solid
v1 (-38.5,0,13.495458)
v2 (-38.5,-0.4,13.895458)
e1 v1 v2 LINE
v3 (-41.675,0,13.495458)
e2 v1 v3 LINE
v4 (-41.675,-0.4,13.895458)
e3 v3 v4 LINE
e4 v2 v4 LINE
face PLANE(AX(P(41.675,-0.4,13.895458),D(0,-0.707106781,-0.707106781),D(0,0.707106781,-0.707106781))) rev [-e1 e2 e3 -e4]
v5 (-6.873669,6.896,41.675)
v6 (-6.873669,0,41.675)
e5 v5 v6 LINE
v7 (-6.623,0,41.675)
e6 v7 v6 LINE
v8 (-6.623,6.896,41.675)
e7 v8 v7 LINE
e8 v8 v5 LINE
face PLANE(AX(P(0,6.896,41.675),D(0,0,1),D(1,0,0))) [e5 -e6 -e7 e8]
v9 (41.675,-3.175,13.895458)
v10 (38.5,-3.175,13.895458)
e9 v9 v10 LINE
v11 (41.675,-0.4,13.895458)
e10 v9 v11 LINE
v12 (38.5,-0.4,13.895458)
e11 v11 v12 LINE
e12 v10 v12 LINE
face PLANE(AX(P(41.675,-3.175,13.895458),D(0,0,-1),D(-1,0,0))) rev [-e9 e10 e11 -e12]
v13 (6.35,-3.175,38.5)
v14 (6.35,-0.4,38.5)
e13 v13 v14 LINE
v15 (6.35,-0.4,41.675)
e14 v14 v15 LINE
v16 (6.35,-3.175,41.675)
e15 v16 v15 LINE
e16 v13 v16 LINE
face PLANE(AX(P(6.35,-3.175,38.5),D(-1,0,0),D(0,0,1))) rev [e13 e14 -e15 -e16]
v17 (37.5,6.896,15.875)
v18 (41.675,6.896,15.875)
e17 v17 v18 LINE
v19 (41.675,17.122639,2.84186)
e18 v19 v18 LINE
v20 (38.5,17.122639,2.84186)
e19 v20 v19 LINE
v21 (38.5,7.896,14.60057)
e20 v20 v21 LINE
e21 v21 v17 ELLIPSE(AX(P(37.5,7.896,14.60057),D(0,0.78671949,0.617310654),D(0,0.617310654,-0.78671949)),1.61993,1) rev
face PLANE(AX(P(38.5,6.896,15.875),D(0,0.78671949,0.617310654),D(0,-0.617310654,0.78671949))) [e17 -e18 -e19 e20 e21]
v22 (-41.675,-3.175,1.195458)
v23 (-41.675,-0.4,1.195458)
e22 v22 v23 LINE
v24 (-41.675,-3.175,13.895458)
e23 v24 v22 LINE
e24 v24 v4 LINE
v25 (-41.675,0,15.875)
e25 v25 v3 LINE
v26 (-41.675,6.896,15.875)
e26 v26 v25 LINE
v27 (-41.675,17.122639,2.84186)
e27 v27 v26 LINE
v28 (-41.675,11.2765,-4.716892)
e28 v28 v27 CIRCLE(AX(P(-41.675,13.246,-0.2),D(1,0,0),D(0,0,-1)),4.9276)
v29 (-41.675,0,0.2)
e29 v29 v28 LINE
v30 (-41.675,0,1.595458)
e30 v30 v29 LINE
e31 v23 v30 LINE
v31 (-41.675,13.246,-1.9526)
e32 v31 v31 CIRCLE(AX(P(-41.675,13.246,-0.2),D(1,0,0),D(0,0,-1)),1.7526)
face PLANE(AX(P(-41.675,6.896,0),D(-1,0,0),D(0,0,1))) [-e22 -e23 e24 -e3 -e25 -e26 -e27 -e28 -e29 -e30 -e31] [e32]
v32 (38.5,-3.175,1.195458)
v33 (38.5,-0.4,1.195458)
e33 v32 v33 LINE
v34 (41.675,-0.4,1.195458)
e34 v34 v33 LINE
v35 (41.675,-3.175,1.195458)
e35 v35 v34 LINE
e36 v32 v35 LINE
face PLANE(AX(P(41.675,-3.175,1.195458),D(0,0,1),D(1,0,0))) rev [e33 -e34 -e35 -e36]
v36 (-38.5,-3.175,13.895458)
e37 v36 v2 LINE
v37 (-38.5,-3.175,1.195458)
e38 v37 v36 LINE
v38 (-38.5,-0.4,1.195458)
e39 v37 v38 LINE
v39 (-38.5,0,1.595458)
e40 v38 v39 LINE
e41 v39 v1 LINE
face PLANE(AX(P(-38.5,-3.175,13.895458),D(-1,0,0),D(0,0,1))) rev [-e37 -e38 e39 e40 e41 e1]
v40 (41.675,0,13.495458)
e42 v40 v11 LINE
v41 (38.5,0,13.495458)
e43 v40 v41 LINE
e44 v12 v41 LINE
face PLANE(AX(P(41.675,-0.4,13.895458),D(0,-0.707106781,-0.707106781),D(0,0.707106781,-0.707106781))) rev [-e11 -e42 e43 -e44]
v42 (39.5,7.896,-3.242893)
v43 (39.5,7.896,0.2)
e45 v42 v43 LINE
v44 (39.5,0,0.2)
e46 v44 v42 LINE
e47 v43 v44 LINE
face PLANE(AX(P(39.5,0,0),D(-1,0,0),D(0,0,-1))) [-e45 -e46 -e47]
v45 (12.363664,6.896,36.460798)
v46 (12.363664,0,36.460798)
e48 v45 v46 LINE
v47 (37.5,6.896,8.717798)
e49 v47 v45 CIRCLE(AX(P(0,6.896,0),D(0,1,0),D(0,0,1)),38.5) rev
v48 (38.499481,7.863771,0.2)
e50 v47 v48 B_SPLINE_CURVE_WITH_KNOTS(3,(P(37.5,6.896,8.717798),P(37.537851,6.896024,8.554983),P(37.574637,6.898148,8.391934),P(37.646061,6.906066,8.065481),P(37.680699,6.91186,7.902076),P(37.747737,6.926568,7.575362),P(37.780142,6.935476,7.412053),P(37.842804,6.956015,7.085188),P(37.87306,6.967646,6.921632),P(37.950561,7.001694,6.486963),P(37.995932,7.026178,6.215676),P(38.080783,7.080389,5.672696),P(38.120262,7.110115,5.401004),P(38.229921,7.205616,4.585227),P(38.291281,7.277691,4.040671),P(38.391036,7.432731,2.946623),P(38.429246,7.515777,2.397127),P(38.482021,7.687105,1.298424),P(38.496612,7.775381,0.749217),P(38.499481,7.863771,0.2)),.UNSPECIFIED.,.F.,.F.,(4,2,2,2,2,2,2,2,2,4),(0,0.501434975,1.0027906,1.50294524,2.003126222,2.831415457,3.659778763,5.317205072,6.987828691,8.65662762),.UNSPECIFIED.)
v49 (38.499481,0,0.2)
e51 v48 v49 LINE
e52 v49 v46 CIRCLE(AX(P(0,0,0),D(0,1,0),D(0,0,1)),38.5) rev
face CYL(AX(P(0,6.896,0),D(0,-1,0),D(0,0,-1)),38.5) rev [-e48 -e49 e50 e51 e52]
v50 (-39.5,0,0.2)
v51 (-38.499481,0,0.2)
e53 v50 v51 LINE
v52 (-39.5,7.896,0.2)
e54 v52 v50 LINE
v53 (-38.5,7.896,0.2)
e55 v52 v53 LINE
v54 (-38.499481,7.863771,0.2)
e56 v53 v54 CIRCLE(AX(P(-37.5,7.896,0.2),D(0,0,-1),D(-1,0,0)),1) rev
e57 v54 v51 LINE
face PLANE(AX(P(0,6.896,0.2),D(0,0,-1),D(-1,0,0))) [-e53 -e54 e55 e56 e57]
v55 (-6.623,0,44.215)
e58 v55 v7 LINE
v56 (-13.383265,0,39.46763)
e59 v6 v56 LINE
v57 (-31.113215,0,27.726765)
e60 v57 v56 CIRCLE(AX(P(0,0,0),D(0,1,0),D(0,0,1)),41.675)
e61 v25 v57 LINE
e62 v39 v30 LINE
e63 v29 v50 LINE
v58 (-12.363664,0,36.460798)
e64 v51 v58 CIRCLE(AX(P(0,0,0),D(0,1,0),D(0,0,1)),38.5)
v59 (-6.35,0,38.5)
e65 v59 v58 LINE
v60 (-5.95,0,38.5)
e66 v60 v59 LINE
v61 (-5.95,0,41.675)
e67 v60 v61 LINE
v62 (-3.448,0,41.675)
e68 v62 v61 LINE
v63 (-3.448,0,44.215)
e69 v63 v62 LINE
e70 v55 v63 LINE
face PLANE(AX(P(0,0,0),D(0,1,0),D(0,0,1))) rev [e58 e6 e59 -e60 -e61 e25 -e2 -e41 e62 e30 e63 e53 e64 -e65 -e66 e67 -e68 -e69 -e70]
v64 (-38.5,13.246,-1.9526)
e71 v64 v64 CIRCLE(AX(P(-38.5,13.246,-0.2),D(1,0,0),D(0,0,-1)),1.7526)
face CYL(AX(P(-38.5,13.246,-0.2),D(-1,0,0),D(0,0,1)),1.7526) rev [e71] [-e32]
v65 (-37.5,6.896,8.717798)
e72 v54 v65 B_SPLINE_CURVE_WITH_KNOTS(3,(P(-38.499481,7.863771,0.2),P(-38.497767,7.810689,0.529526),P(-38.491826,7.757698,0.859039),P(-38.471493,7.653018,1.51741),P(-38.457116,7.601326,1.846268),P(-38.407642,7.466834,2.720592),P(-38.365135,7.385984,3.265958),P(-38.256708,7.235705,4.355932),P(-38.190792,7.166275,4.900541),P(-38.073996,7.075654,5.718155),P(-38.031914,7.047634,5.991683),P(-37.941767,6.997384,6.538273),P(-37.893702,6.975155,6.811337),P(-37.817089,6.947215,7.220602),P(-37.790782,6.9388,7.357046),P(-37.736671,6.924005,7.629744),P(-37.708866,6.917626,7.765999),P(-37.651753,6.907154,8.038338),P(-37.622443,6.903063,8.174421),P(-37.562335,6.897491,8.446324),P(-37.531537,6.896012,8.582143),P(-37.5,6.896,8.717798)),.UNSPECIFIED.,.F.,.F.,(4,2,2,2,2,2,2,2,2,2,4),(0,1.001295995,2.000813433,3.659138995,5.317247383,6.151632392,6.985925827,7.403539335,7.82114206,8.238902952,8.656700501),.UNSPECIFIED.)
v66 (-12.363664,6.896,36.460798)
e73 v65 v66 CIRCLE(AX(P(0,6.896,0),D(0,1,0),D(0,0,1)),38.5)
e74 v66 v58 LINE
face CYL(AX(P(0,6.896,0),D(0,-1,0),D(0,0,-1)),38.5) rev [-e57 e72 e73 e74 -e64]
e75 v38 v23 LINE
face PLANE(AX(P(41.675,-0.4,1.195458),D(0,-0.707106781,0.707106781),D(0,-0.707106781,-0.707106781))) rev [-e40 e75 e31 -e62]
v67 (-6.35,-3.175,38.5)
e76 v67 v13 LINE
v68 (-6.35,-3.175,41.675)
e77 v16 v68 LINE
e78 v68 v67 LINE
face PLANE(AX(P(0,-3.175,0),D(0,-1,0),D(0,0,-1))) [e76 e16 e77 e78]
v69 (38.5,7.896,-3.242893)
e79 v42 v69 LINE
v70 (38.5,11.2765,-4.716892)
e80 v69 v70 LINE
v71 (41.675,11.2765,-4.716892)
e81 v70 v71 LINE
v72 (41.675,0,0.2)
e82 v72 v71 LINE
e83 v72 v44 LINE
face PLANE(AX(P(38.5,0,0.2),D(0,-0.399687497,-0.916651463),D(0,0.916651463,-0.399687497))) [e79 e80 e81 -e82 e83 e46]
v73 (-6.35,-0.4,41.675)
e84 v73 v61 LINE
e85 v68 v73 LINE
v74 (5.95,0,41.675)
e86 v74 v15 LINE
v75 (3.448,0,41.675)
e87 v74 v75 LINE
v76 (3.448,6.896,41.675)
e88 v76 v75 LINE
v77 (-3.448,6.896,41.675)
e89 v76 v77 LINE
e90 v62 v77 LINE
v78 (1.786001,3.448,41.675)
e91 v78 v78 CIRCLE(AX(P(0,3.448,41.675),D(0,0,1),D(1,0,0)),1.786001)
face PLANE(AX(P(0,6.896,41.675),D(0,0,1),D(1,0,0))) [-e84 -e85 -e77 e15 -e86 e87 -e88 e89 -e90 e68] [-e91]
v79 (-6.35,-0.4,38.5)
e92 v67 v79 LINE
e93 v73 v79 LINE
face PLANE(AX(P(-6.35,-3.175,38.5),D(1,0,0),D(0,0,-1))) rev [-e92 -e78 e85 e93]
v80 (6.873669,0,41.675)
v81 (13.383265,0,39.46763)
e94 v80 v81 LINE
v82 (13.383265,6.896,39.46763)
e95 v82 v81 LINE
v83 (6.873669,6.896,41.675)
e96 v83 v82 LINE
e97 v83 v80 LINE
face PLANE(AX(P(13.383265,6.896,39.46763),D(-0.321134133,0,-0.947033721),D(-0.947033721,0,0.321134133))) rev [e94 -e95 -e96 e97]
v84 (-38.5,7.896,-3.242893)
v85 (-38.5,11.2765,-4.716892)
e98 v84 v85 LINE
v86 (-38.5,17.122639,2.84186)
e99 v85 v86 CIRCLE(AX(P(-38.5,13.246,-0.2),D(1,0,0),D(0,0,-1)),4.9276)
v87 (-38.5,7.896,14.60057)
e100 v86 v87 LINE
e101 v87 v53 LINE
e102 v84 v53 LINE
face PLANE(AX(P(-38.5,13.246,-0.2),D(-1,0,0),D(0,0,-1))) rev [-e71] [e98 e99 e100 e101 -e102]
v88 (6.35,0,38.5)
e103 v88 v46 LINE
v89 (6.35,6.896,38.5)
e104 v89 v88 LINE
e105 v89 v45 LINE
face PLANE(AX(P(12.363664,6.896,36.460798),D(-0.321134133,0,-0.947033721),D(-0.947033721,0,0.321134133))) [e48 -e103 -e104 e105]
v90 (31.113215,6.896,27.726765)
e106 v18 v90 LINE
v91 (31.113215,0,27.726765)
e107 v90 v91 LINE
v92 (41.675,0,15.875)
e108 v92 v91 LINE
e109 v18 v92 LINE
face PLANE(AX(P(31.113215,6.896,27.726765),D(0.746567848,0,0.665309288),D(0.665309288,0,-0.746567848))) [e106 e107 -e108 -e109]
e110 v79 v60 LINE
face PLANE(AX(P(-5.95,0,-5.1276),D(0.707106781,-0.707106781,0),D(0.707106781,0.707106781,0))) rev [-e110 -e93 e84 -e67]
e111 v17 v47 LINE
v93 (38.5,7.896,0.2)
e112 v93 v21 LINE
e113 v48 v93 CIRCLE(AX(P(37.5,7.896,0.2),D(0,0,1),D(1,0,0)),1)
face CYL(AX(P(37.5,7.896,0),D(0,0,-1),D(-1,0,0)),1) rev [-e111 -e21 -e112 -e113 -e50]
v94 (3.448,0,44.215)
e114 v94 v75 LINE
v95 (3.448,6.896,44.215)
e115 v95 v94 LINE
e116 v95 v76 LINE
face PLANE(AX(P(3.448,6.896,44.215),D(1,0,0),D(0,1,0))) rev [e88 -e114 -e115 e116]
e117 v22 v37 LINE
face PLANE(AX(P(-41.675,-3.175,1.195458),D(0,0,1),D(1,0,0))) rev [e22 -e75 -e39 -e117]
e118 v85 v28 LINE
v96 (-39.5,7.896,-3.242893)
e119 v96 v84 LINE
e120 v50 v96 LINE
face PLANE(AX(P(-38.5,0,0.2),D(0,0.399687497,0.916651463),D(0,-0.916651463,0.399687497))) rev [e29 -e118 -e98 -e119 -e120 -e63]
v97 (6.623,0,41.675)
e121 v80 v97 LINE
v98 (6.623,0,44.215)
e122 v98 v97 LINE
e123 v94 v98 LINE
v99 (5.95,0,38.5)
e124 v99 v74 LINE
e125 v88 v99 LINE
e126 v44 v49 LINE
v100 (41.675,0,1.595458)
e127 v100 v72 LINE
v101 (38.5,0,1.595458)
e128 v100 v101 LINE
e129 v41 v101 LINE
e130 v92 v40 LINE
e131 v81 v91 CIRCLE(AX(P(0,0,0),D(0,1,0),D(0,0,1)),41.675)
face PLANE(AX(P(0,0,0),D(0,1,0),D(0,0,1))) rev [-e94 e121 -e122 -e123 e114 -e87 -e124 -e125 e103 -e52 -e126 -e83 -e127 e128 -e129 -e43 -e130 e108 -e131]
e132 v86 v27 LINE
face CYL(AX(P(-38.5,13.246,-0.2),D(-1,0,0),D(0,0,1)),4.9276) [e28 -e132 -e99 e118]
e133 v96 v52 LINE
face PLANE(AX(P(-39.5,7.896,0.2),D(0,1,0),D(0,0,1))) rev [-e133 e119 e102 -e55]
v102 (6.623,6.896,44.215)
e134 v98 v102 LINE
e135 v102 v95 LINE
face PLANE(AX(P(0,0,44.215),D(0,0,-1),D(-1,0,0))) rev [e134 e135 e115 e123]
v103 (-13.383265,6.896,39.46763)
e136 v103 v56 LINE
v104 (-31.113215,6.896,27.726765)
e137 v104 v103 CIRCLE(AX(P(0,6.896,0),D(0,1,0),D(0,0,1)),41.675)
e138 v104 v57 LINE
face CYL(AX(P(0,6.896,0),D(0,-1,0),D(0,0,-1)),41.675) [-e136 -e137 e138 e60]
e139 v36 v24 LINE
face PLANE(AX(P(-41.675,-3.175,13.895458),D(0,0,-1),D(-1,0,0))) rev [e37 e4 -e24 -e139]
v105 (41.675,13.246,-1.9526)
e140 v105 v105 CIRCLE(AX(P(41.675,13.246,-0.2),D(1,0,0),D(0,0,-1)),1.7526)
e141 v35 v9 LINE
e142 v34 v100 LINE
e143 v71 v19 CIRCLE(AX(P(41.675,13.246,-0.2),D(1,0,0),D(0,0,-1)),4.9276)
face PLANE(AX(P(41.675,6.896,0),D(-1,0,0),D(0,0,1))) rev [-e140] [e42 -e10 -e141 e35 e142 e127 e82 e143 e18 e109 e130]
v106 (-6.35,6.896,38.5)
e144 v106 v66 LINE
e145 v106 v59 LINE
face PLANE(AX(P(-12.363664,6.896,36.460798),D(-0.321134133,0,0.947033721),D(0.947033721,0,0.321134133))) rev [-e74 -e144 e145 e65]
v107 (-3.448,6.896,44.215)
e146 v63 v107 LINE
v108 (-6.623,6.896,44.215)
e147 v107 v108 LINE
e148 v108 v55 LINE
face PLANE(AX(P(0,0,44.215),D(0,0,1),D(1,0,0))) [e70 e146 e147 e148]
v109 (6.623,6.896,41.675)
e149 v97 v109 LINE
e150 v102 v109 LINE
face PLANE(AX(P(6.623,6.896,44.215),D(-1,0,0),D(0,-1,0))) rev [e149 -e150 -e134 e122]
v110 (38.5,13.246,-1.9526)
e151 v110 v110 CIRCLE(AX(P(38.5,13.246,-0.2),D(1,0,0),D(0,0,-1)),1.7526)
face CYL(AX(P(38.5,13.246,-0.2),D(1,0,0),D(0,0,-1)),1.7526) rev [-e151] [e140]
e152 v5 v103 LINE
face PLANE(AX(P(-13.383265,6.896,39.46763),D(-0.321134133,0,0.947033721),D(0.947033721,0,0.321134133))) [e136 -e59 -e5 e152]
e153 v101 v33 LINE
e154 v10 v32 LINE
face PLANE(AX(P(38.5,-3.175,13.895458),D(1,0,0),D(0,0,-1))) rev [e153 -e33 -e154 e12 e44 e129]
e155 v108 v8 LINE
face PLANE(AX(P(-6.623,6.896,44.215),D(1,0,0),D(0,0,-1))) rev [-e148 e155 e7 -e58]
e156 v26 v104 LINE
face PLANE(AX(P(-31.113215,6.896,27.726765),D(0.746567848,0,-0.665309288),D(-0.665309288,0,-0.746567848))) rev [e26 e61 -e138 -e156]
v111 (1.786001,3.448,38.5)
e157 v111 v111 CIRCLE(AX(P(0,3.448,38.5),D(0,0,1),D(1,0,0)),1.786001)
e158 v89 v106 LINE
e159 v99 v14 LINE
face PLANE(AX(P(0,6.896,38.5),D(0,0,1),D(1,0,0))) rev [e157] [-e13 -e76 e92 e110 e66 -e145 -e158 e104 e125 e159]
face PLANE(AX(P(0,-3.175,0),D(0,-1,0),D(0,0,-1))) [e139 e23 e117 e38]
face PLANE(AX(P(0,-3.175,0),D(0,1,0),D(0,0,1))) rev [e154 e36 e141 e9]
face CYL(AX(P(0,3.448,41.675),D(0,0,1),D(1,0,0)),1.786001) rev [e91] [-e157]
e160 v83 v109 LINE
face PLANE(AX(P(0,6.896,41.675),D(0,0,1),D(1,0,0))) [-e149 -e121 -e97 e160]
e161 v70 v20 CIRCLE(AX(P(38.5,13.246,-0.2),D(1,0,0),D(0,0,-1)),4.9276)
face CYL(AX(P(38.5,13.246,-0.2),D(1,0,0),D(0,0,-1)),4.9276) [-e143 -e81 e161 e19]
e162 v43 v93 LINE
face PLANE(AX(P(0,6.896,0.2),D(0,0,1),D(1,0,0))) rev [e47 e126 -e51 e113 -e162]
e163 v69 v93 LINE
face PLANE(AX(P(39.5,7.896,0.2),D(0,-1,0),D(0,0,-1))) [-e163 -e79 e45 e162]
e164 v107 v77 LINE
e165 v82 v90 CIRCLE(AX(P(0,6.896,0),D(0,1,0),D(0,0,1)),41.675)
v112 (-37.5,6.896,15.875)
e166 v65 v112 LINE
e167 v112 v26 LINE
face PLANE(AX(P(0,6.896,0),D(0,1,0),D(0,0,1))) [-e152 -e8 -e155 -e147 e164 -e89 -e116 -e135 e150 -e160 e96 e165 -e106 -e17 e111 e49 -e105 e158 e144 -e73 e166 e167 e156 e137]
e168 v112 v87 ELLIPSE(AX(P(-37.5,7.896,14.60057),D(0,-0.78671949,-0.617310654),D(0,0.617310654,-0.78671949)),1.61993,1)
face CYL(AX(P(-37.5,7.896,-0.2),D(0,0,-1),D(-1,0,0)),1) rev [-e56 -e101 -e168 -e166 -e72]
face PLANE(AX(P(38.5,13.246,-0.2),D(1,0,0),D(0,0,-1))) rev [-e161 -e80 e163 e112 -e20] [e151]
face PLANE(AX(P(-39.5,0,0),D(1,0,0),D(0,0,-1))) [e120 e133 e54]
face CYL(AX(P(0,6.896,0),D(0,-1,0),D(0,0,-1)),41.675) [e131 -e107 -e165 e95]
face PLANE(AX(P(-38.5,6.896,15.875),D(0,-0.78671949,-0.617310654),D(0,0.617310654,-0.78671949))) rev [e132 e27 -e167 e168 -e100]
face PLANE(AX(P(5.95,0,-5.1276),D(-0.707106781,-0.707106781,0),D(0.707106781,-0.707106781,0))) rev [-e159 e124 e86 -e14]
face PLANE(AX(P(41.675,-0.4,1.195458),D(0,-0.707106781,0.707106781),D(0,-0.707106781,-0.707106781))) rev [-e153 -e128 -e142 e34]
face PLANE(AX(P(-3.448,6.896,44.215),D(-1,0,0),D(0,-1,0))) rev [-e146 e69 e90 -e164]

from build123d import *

# Parameters (mm, degrees)
BOSS_EXTRUDE2_DEPTH             = 6.896
SKETCH2_R                       = 1.7526
BOSS_EXTRUDE3_DEPTH             = 3.175
F_9_64_0_14063_DIAMETER_HOLE2_D = 3.572002
SKETCH9_W                       = 3.175
SKETCH9_H                       = 6.896
BOSS_EXTRUDE5_DEPTH             = 2.54
SKETCH10_W                      = 3.175
SKETCH10_H                      = 12.7
SKETCH10_W_2                    = 12.7
SKETCH10_H_2                    = 3.175
BOSS_EXTRUDE6_DEPTH             = 3.175
CUT_EXTRUDE1_DEPTH              = 97.085734956
CUT_EXTRUDE2_DEPTH              = 66.25004773
FILLET2_R                       = 1
CUT_EXTRUDE3_DEPTH              = 1


with BuildPart() as part:
    # Sketch1 → Boss-Extrude2 (new body)
    with BuildSketch(Plane(origin=(0, 0, 0), x_dir=(1, 0, 0), z_dir=(0, 1, 0))):
        with BuildLine():
            Line((12.363664128, -36.460798254), (6.35, -38.5))
            Line((6.35, -38.5), (-6.35, -38.5))
            Line((-6.35, -38.5), (-12.363664128, -36.460798254))
            ThreePointArc((-12.363664128, -36.460798254), (-27.097558937, -27.349082245), (-36.345013413, -12.7))
            ThreePointArc((-36.345013413, -12.7), (-37.940572846, -6.539337285), (-38.499480516, -0.2))
            Line((-38.499480516, -0.2), (-41.675, -0.2))
            Line((-41.675, -0.2), (-41.675, -15.875))
            Line((-41.675, -15.875), (-31.113215051, -27.726764582))
            ThreePointArc((-31.113215051, -27.726764582), (-23.009697223, -34.747078419), (-13.383265001, -39.467630318))
            Line((-13.383265001, -39.467630318), (-6.873668831, -41.675))
            Line((-6.873668831, -41.675), (6.873668831, -41.675))
            Line((6.873668831, -41.675), (13.383265001, -39.467630318))
            ThreePointArc((13.383265001, -39.467630318), (23.009697223, -34.747078419), (31.113215051, -27.726764582))
            Line((31.113215051, -27.726764582), (41.675, -15.875))
            Line((41.675, -15.875), (41.675, -0.2))
            Line((41.675, -0.2), (38.499480516, -0.2))
            ThreePointArc((38.499480516, -0.2), (37.940572846, -6.539337285), (36.345013413, -12.7))
            ThreePointArc((36.345013413, -12.7), (27.097558937, -27.349082245), (12.363664128, -36.460798254))
        make_face()
    extrude(amount=BOSS_EXTRUDE2_DEPTH)

    # Sketch2 → Boss-Extrude3 (add)
    with BuildSketch(Plane(origin=(41.675, 0, 0), x_dir=(0, 0, -1), z_dir=(1, 0, 0))):
        with BuildLine():
            Line((-15.875, 6.896), (-2.841859979, 17.12263896))
            ThreePointArc((-2.841859979, 17.12263896), (3.214674972, 17.143816898), (4.716891749, 11.27649989))
            Line((4.716891749, 11.27649989), (-0.2, 0))
            Line((-0.2, 0), (-0.2, 6.896))
            Line((-0.2, 6.896), (-15.875, 6.896))
        make_face()
        with Locations((0.2, 13.246)):
            Circle(SKETCH2_R, mode=Mode.SUBTRACT)
    boss_extrude3 = extrude(amount=-BOSS_EXTRUDE3_DEPTH)

    # Mirror1: Boss-Extrude3 across plane
    add(boss_extrude3.mirror(Plane.ZY))

    # 9/64 (0.14063) Diameter Hole2 (through all)
    with Locations(Plane.XY.offset(41.675)):
        with Locations((0, 3.448)):
            Hole(F_9_64_0_14063_DIAMETER_HOLE2_D / 2)

    # Sketch9 → Boss-Extrude5 (add)
    with BuildSketch(Plane.XY.offset(41.675)):
        with Locations((-5.0355, 3.448)):
            Rectangle(SKETCH9_W, SKETCH9_H)
        with Locations((5.0355, 3.448)):
            Rectangle(SKETCH9_W, SKETCH9_H)
    extrude(amount=BOSS_EXTRUDE5_DEPTH)

    # Sketch10 → Boss-Extrude6 (add)
    with BuildSketch(Plane(origin=(0, 0, 0), x_dir=(-1, 0, 0), z_dir=(0, -1, 0))):
        with Locations((40.0875, -7.545458209)):
            Rectangle(SKETCH10_W, SKETCH10_H)
        with Locations((-40.0875, -7.545458209)):
            Rectangle(SKETCH10_W, SKETCH10_H)
        with Locations((0, -40.0875)):
            Rectangle(SKETCH10_W_2, SKETCH10_H_2)
    extrude(amount=BOSS_EXTRUDE6_DEPTH)

    # Sketch11 → Cut-Extrude1 (cut, through all)
    with BuildSketch(Plane.ZY.offset(41.675)):
        Polygon((13.895458209, -0.4), (13.495458209, 0), (13.895458209, 0), align=None)
        Polygon((1.595458209, 0), (1.195458209, 0), (1.195458209, -0.4), align=None)
    extrude(amount=-CUT_EXTRUDE1_DEPTH, mode=Mode.SUBTRACT)

    # Sketch12 → Cut-Extrude2 (cut, through all)
    with BuildSketch(Plane.XY.offset(41.675)):
        Polygon((6.35, -0.4), (6.35, 0), (5.95, 0), align=None)
        Polygon((-5.95, 0), (-6.35, -0.4), (-6.35, 0), align=None)
    extrude(amount=-CUT_EXTRUDE2_DEPTH, mode=Mode.SUBTRACT)

    # Fillet2
    # the kernel refuses this fillet: 1 mm, written as the material it adds along each edge
    with BuildSketch(Plane(origin=(-38.5, 6.896, 0.2), x_dir=(1, 0, 0), z_dir=(0, 0, 1))) as fillet2_piece_1_section:
        with BuildLine():
            CenterArc((FILLET2_R, FILLET2_R), FILLET2_R, 180, 90)
            Line((0, FILLET2_R), (0, 0))
            Line((0, 0), (FILLET2_R, 0))
        make_face()
    fillet2_piece_1 = extrude(amount=18.175, mode=Mode.PRIVATE)
    fillet2_piece_1 = fillet2_piece_1 - Plane(origin=(0, 7.133182821, 0), x_dir=(-0.321134133185776, 0, 0.9470337208901384), z_dir=(0, -1, 0)) * Cylinder(38.5, 41, mode=Mode.PRIVATE)
    fillet2_piece_1 = split(fillet2_piece_1, bisect_by=Plane(origin=(-38.301679368, 10.067346027, 11.833340077), z_dir=(0, -0.7867194903062766, -0.617310654024562)), keep=Keep.TOP, mode=Mode.PRIVATE)
    add(fillet2_piece_1)
    with BuildSketch(Plane(origin=(38.5, 6.896, 0.2), x_dir=(-1, 0, 0), z_dir=(0, 0, 1))) as fillet2_piece_2_section:
        with BuildLine():
            CenterArc((FILLET2_R, -FILLET2_R), FILLET2_R, 90, 90)
            Line((0, -FILLET2_R), (0, 0))
            Line((0, 0), (FILLET2_R, 0))
        make_face()
    fillet2_piece_2 = extrude(amount=18.175, mode=Mode.PRIVATE)
    fillet2_piece_2 = fillet2_piece_2 - Plane(origin=(0, 7.133182807, 0), x_dir=(0.9999865069084622, 0, 0.0051948051948059485), z_dir=(0, -1, 0)) * Cylinder(38.5, 41, mode=Mode.PRIVATE)
    fillet2_piece_2 = split(fillet2_piece_2, bisect_by=Plane(origin=(38.301679263, 10.067346636, 11.833339301), z_dir=(0, -0.7867194903062766, -0.617310654024562)), keep=Keep.TOP, mode=Mode.PRIVATE)
    add(fillet2_piece_2)

    # Sketch14 → Cut-Extrude3 (cut)
    with BuildSketch(Plane(origin=(-38.5, 0, 0), x_dir=(0, 0, -1), z_dir=(1, 0, 0))):
        Polygon((-0.2, 0), (-0.2, 7.896), (3.242892532, 7.896), align=None)
    cut_extrude3 = extrude(amount=-CUT_EXTRUDE3_DEPTH, mode=Mode.SUBTRACT)

    # Mirror2: Cut-Extrude3 across plane
    add(cut_extrude3.mirror(Plane.ZY), mode=Mode.SUBTRACT)


solid = part.part
